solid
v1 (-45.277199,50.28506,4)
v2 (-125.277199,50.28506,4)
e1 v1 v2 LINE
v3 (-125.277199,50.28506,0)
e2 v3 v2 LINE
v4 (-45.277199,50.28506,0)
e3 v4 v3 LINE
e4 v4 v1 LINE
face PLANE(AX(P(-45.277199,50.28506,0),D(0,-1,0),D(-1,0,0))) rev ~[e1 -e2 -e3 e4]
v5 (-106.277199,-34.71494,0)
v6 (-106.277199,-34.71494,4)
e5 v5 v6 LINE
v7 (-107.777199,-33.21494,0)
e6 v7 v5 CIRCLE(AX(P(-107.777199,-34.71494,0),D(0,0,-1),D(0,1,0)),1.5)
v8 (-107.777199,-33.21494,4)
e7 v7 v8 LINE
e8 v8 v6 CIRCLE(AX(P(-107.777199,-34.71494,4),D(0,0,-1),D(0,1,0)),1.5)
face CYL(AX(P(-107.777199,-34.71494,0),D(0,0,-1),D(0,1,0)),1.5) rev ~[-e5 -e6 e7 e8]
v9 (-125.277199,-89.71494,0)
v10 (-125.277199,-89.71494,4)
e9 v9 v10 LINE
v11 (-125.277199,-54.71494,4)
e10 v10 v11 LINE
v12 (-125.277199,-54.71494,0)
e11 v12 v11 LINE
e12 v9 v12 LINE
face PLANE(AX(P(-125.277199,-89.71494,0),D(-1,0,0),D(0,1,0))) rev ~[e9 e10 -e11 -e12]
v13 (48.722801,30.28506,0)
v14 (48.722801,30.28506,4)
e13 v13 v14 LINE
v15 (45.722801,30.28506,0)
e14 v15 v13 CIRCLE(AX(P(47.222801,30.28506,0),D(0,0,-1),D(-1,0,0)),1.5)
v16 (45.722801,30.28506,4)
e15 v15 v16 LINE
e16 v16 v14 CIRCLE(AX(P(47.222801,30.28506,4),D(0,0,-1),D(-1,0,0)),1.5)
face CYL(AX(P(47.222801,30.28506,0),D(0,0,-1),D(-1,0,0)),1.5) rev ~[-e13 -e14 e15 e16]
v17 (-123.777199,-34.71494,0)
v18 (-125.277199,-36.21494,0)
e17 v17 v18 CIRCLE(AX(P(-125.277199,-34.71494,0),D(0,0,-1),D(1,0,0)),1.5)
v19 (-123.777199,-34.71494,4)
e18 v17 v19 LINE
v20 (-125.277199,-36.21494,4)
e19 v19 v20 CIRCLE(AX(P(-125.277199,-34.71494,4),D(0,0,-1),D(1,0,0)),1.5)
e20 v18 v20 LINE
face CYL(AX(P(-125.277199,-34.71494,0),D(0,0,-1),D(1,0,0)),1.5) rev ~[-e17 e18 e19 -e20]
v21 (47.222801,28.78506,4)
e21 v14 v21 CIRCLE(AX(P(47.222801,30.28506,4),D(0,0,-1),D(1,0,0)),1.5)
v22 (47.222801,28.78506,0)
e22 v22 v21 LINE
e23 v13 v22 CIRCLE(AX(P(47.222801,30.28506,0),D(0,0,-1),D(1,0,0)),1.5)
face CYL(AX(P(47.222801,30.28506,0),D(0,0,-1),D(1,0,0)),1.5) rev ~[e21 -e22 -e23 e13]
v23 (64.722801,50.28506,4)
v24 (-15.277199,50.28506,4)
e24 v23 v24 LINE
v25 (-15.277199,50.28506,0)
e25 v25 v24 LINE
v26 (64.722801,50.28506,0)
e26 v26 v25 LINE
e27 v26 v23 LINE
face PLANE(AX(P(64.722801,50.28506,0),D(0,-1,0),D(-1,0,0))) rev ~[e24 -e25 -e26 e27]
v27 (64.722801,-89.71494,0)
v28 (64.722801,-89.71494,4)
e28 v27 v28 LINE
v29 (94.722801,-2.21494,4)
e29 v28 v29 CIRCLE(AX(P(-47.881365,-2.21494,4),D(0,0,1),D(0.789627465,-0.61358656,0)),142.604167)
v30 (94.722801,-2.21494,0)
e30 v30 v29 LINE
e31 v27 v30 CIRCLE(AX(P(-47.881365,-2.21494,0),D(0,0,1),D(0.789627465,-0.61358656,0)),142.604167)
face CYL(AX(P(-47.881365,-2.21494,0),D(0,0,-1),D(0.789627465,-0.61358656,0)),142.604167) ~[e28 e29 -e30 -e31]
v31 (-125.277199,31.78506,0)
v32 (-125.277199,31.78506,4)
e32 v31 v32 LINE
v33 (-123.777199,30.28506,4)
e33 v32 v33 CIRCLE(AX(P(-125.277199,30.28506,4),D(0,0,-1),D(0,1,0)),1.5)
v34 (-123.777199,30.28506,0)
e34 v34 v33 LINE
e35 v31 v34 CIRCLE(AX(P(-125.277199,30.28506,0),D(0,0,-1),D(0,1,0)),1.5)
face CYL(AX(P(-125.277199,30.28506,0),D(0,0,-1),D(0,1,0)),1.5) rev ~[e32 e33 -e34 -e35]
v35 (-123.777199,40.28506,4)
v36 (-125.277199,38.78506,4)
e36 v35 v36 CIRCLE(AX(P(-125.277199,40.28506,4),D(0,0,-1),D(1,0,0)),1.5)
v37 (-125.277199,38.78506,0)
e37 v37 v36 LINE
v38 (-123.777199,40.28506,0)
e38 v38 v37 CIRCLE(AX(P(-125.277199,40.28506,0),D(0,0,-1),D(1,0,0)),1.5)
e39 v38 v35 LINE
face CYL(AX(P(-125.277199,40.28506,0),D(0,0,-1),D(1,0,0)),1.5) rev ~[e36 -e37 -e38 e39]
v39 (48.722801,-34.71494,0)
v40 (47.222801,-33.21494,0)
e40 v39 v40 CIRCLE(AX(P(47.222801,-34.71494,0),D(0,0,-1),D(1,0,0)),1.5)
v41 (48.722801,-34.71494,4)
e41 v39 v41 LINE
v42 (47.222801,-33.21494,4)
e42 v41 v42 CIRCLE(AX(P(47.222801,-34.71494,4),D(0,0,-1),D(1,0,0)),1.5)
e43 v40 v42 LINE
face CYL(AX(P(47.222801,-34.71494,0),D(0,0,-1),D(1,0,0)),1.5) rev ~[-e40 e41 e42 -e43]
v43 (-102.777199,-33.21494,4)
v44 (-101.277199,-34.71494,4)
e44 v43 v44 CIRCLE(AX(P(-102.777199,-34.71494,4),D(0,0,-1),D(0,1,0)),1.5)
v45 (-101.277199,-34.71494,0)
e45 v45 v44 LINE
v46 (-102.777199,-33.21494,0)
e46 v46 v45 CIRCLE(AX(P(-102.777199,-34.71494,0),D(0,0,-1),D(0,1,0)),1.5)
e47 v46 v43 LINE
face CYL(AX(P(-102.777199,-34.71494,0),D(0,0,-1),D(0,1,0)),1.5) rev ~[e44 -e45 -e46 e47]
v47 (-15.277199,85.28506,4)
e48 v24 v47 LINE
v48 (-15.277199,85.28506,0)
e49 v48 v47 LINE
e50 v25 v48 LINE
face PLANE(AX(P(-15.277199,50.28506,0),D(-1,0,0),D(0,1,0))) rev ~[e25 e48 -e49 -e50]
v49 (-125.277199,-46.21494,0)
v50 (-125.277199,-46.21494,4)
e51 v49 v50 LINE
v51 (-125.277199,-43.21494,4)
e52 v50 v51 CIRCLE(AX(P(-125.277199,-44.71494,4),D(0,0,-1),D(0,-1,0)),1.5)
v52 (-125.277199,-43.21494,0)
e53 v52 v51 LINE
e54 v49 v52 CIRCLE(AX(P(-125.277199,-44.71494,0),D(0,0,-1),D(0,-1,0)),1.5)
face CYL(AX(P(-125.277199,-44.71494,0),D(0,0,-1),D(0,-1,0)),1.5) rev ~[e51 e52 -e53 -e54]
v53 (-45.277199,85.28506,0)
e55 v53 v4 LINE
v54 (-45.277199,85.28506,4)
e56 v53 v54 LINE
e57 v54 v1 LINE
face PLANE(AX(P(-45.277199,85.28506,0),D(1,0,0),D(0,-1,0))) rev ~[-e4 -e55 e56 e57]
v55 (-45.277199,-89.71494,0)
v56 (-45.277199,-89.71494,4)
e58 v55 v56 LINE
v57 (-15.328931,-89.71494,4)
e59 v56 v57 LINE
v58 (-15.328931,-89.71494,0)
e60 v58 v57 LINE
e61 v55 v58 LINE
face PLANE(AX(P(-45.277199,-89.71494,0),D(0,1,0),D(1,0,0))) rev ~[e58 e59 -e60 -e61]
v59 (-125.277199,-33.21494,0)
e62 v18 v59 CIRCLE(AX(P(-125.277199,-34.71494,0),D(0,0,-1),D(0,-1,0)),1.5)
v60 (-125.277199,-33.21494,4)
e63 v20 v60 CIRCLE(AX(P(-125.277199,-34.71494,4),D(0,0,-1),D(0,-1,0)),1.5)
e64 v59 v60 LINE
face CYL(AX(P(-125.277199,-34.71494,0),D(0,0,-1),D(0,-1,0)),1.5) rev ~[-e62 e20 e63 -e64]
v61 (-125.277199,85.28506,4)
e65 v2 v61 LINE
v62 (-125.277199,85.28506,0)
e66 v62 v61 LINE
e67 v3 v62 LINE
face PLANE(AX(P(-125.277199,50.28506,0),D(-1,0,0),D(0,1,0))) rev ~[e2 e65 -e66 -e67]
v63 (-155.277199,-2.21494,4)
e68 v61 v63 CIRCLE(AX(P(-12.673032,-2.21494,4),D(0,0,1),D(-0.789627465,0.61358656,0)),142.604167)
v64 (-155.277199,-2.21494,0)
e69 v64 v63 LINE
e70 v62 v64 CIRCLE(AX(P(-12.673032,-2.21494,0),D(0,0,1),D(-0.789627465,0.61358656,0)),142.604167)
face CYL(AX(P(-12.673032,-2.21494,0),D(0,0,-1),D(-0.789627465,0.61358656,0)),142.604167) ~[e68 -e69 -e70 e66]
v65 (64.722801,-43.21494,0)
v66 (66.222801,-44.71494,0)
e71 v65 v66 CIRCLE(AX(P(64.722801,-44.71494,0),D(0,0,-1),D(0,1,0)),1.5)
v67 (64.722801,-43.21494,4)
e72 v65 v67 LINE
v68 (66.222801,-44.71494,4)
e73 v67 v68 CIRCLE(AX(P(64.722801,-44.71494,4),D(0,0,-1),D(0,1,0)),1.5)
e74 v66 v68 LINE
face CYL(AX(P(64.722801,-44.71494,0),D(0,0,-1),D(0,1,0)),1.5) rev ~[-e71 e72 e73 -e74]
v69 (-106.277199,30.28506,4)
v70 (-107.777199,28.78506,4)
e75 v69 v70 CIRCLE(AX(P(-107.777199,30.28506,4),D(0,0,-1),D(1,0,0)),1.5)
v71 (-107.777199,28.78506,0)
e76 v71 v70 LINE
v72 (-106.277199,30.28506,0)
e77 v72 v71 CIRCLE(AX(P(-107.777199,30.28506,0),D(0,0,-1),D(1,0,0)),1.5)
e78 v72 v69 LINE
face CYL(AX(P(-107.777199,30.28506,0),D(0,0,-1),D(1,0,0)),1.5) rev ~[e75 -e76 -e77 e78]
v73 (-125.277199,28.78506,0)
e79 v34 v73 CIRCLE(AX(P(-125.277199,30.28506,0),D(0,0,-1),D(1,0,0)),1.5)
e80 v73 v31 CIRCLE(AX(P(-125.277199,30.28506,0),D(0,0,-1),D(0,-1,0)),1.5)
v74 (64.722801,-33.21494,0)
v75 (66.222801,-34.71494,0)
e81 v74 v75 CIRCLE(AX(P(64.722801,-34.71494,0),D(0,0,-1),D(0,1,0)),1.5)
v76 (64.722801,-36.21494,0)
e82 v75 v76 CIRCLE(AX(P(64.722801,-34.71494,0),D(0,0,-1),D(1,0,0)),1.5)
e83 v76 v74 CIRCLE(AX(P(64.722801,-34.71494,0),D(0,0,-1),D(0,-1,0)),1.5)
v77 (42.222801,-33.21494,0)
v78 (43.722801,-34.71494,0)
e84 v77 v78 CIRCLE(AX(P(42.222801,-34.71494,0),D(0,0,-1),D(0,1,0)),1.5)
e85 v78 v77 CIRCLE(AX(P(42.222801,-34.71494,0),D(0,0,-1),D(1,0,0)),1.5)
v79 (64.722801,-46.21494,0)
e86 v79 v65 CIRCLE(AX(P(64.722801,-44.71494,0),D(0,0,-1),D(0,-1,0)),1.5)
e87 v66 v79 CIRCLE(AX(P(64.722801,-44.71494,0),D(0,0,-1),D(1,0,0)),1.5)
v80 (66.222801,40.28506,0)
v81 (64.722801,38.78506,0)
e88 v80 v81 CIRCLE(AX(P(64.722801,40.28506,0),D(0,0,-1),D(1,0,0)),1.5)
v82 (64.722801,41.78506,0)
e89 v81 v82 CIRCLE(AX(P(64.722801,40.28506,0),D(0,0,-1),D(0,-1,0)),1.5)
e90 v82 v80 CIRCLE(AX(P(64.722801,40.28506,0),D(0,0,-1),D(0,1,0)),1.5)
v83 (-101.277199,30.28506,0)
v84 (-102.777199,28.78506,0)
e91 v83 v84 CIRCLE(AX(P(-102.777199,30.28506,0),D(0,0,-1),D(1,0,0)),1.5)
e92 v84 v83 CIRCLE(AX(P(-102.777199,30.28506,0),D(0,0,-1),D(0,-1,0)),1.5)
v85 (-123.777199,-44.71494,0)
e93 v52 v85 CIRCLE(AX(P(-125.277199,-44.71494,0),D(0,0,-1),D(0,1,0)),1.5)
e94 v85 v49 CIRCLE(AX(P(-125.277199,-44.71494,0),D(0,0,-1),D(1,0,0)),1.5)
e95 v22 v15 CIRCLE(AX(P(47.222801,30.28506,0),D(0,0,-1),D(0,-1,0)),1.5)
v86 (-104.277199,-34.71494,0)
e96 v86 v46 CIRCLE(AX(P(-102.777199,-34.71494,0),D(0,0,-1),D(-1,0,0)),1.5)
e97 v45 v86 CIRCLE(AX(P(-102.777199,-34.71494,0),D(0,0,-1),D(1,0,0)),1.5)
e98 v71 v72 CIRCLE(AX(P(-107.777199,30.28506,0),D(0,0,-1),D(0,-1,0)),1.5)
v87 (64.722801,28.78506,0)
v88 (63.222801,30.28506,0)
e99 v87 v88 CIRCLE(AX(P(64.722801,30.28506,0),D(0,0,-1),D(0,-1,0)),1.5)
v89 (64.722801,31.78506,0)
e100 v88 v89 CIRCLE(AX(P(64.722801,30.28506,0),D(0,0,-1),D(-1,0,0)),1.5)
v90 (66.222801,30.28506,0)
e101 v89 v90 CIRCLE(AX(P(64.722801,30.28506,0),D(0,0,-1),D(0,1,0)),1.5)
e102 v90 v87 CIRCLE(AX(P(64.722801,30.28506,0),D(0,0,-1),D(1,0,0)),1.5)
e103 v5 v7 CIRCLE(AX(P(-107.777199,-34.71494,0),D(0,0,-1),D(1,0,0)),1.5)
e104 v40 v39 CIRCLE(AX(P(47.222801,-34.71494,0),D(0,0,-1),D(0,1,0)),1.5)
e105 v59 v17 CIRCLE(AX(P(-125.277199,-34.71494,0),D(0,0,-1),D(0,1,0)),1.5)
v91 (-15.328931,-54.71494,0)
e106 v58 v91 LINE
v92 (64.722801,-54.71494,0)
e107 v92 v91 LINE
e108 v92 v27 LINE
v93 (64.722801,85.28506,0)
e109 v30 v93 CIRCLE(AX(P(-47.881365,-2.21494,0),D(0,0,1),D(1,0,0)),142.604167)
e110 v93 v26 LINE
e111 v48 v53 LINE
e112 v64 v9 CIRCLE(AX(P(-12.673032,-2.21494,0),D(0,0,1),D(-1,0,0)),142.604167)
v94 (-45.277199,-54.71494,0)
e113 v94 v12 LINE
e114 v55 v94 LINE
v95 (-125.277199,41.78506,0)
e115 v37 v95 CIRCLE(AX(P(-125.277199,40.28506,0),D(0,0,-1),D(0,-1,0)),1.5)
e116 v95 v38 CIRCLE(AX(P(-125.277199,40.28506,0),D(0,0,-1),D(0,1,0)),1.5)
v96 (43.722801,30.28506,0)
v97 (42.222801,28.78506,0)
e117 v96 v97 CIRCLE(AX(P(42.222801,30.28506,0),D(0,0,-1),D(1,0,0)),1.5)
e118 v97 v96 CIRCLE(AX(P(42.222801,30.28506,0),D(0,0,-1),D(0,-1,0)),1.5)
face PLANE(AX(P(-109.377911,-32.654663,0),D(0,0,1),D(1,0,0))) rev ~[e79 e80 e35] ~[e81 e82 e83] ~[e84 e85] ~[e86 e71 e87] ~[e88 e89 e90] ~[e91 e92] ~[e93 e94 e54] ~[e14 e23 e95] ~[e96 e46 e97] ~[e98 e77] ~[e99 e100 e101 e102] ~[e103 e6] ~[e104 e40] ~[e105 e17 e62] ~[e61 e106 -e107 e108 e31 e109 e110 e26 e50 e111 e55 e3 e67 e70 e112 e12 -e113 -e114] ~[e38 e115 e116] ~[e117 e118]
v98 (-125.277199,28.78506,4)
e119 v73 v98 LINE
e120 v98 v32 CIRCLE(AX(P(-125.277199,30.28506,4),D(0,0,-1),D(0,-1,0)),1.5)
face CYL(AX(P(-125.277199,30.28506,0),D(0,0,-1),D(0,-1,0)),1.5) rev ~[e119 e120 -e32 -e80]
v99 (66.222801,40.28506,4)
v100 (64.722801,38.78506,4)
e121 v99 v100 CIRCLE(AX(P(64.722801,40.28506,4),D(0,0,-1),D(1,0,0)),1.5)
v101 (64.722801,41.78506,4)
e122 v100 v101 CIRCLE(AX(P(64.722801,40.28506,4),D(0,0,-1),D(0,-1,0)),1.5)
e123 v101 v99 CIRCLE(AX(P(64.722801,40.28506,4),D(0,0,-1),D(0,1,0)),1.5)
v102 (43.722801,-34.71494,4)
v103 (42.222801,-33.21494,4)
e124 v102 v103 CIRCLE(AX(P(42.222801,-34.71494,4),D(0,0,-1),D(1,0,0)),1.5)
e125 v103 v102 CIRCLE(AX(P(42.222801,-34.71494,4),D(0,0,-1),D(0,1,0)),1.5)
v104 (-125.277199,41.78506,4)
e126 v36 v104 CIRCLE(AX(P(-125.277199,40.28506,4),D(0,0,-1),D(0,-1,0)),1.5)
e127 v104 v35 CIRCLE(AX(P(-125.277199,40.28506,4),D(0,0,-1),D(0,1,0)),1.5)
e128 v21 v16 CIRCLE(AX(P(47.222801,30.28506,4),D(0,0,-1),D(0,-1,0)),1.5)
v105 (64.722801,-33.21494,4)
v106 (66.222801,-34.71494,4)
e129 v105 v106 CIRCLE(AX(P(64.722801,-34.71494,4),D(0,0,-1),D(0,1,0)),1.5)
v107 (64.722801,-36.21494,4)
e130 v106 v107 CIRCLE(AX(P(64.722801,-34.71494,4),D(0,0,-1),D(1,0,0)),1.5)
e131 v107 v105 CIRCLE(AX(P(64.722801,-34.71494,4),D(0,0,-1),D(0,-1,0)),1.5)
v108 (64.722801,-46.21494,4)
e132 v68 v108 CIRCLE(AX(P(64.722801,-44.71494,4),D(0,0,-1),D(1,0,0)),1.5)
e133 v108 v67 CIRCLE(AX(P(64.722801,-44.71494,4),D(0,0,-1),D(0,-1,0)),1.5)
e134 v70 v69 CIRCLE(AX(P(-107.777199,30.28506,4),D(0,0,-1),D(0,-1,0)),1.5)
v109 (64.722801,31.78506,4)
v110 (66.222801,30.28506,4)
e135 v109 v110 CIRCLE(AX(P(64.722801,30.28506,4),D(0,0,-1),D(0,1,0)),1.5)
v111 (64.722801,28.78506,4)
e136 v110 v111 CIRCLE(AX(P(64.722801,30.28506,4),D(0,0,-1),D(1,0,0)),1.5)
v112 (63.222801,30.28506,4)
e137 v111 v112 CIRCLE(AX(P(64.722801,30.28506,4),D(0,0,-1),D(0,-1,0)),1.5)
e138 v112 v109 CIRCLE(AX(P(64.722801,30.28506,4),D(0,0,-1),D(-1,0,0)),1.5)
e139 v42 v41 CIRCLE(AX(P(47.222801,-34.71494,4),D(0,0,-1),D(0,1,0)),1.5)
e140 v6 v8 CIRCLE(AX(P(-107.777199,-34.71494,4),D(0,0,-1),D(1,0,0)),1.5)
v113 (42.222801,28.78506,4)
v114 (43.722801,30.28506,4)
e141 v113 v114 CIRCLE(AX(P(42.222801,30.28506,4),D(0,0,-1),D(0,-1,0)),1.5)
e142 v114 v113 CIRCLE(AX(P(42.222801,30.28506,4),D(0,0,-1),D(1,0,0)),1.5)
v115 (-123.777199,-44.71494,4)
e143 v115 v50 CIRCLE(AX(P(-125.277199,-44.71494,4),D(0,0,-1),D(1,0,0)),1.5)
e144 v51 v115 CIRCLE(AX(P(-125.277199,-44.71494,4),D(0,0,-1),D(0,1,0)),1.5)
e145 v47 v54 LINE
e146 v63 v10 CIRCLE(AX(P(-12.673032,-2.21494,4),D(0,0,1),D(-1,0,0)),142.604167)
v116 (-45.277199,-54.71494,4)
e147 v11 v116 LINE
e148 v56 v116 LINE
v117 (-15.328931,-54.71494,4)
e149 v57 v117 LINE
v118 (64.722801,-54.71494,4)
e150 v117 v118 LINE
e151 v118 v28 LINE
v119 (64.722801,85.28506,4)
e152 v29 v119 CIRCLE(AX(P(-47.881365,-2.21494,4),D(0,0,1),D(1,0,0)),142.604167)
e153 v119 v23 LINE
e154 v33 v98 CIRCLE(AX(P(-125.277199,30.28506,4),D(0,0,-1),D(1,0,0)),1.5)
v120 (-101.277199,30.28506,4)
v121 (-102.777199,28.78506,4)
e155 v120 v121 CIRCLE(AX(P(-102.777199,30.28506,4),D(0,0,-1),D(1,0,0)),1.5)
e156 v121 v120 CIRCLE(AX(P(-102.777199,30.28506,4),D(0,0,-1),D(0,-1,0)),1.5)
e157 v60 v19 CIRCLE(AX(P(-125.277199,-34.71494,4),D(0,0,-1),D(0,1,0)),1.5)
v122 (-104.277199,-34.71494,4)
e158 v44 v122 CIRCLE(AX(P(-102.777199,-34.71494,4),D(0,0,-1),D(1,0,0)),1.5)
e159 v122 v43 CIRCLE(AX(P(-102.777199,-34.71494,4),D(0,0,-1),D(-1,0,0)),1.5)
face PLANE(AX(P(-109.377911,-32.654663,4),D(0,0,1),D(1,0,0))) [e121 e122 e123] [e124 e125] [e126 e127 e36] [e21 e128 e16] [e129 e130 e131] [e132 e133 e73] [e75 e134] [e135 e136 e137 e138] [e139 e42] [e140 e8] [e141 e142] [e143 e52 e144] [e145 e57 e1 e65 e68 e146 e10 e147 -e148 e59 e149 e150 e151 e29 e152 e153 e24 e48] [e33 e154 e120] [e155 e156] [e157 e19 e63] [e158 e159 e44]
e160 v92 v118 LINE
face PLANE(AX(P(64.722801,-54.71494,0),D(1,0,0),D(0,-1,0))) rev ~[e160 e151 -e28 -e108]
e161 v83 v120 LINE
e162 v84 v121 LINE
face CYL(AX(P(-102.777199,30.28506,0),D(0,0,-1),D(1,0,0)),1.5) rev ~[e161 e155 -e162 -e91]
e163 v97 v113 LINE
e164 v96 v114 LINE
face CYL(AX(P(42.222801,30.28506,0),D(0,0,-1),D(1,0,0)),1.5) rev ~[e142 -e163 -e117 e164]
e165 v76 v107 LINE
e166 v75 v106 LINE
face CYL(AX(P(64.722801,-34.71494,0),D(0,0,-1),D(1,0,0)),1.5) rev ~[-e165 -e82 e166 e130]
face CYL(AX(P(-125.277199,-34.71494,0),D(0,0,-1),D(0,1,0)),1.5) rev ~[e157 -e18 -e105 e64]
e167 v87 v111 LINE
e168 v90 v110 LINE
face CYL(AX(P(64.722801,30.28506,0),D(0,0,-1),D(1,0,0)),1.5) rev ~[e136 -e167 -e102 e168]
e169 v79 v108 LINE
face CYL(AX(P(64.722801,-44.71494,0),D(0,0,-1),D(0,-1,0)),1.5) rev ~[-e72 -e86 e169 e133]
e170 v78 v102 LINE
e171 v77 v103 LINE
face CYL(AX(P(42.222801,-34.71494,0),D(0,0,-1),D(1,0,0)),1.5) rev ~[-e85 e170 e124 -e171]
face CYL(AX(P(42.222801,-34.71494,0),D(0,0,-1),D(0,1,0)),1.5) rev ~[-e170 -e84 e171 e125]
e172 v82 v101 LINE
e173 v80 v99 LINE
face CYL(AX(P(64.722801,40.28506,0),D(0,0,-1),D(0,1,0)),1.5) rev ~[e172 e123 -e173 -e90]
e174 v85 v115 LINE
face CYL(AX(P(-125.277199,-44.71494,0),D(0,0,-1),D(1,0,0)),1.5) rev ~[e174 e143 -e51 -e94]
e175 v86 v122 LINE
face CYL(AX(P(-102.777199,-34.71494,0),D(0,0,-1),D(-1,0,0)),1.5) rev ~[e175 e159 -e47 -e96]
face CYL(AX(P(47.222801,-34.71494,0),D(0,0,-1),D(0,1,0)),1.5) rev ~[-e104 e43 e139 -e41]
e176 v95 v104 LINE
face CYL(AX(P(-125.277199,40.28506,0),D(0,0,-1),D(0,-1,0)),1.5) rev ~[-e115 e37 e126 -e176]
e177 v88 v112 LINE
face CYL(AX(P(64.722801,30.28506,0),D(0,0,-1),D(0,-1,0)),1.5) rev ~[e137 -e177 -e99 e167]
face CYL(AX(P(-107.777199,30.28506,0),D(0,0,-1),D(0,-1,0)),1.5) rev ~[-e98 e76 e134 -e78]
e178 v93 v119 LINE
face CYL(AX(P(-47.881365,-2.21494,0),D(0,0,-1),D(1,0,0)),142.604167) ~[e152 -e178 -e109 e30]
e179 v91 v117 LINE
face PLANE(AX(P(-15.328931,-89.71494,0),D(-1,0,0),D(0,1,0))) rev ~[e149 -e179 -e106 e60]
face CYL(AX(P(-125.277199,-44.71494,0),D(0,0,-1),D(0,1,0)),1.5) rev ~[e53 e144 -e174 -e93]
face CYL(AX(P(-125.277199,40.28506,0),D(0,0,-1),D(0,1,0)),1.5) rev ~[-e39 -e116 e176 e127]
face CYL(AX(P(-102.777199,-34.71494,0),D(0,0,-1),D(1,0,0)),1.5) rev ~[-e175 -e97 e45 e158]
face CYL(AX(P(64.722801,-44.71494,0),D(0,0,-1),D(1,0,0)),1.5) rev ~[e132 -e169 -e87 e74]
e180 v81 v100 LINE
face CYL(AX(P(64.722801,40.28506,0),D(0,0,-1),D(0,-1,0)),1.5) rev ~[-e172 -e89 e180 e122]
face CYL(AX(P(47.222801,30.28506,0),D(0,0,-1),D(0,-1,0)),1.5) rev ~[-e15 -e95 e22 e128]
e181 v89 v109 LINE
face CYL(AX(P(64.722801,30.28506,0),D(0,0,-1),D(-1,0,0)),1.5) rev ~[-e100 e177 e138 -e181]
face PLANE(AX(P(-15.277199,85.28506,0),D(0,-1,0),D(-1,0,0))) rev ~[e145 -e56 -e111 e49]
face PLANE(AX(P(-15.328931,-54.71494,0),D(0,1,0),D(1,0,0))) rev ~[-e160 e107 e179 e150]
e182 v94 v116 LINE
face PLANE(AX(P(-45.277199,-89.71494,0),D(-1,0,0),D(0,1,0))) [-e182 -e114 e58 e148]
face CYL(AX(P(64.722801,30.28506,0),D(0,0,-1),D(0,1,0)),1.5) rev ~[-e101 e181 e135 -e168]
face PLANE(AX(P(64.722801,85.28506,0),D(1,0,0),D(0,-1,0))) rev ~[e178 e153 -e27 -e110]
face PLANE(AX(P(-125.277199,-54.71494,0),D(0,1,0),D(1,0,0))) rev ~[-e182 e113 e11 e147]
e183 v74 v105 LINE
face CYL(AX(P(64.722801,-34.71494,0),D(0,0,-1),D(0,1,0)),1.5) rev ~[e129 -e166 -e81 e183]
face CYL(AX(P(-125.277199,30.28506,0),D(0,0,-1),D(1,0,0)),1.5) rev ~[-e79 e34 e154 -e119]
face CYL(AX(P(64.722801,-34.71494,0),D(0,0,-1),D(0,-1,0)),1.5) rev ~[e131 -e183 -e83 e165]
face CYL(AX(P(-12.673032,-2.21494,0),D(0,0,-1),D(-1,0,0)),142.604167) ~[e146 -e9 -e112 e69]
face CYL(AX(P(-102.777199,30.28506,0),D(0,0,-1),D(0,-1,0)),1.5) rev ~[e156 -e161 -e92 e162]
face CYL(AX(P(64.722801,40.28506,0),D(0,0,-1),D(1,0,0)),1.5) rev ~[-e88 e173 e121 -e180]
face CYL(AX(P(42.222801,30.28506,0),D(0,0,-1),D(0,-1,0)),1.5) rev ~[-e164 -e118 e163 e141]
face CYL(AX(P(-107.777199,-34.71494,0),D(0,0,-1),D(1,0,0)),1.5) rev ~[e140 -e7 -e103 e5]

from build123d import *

# Parameters (mm, degrees)
F0_W     = 15
F0_H     = 4.4212083991
F0_H_2   = 48.0787916009
F0_W_2   = 29.9482679234
F0_H_3   = 35
F1_DEPTH = 4
F2_DEPTH = 4


with BuildPart() as f1:
    # F0 (on Top) → F1 (new body)
    with BuildSketch(Plane.XY):
        with BuildLine():
            Line((-125.2771986143, 41.785060304), (-125.2771986143, 50.285060304))
            Line((-125.2771986143, 50.285060304), (-125.2771986143, 85.285060304))
            ThreePointArc((-125.2771986143, 85.285060304), (-147.5688652809, 44.035060304), (-155.2771986143, -2.214939696))
            Line((-155.2771986143, -2.214939696), (-125.2771986143, -2.214939696))
            Line((-125.2771986143, -2.214939696), (-125.2771986143, 28.785060304))
            ThreePointArc((-125.2771986143, 28.785060304), (-126.7771986143, 30.285060304), (-125.2771986143, 31.785060304))
            Line((-125.2771986143, 31.785060304), (-125.2771986143, 38.785060304))
            ThreePointArc((-125.2771986143, 38.785060304), (-126.7771986143, 40.285060304), (-125.2771986143, 41.785060304))
        make_face()
        with BuildLine():
            Line((-85.2771986143, 50.285060304), (-125.2771986143, 50.285060304))
            Line((-125.2771986143, 50.285060304), (-125.2771986143, 41.785060304))
            ThreePointArc((-125.2771986143, 41.785060304), (-124.2165384425, 41.3457204758), (-123.7771986143, 40.285060304))
            ThreePointArc((-123.7771986143, 40.285060304), (-124.2165384425, 39.2244001322), (-125.2771986143, 38.785060304))
            Line((-125.2771986143, 38.785060304), (-125.2771986143, 31.785060304))
            ThreePointArc((-125.2771986143, 31.785060304), (-124.2165384425, 31.3457204758), (-123.7771986143, 30.285060304))
            ThreePointArc((-123.7771986143, 30.285060304), (-124.2165384425, 29.2244001322), (-125.2771986143, 28.785060304))
            Line((-125.2771986143, 28.785060304), (-125.2771986143, -2.214939696))
            Line((-125.2771986143, -2.214939696), (-107.7771986143, -2.214939696))
            Line((-107.7771986143, -2.214939696), (-102.7771986143, -2.214939696))
            Line((-102.7771986143, -2.214939696), (-85.2771986143, -2.214939696))
            Line((-85.2771986143, -2.214939696), (-85.2771986143, 50.285060304))
        make_face()
        with BuildLine():
            ThreePointArc((-106.2771986143, 30.285060304), (-106.7165384425, 29.2244001322), (-107.7771986143, 28.785060304))
            ThreePointArc((-107.7771986143, 28.785060304), (-108.837858786, 31.3457204758), (-106.2771986143, 30.285060304))
        make_face(mode=Mode.SUBTRACT)
        with BuildLine():
            ThreePointArc((-101.2771986143, 30.285060304), (-101.7165384425, 29.2244001322), (-102.7771986143, 28.785060304))
            ThreePointArc((-102.7771986143, 28.785060304), (-103.837858786, 31.3457204758), (-101.2771986143, 30.285060304))
        make_face(mode=Mode.SUBTRACT)
        Polygon((-45.2771986143, 50.285060304), (-85.2771986143, 50.285060304), (-85.2771986143, -2.214939696), (-45.2771986143, -2.214939696), (-45.2771986143, 45.8638519049), align=None)
        with Locations((-37.7771986143, 48.0744561044)):
            Rectangle(F0_W, F0_H)
        Polygon((-45.2771986143, 85.285060304), (-45.2771986143, 50.285060304), (-30.2771986143, 50.285060304), (-15.2771986143, 50.285060304), (-15.2771986143, 85.285060304), align=None)
        Polygon((-45.2771986143, -2.214939696), (-85.2771986143, -2.214939696), (-85.2771986143, -34.714939696), (-85.2771986143, -54.714939696), (-45.2771986143, -54.714939696), align=None)
        with BuildLine():
            Line((-125.2771986143, -2.214939696), (-155.2771986143, -2.214939696))
            ThreePointArc((-155.2771986143, -2.214939696), (-147.5688652809, -48.464939696), (-125.2771986143, -89.714939696))
            Line((-125.2771986143, -89.714939696), (-125.2771986143, -54.714939696))
            Line((-125.2771986143, -54.714939696), (-125.2771986143, -46.214939696))
            ThreePointArc((-125.2771986143, -46.214939696), (-126.7771986143, -44.714939696), (-125.2771986143, -43.214939696))
            Line((-125.2771986143, -43.214939696), (-125.2771986143, -36.214939696))
            ThreePointArc((-125.2771986143, -36.214939696), (-126.7771986143, -34.714939696), (-125.2771986143, -33.214939696))
            Line((-125.2771986143, -33.214939696), (-125.2771986143, -2.214939696))
        make_face()
        with Locations((-37.7771986143, 21.8244561044)):
            Rectangle(F0_W, F0_H_2)
        with Locations((-22.7771986143, 48.0744561044)):
            Rectangle(F0_W, F0_H)
        Polygon((-30.2771986143, -2.214939696), (-45.2771986143, -2.214939696), (-45.2771986143, -54.714939696), (-15.3289306909, -54.714939696), (-15.2771986143, -54.714939696), (-15.2771986143, -2.214939696), align=None)
        with Locations((-22.7771986143, 21.8244561044)):
            Rectangle(F0_W, F0_H_2)
        with BuildLine():
            Line((64.7228013857, 50.285060304), (-15.2771986143, 50.285060304))
            Line((-15.2771986143, 50.285060304), (-15.2771986143, 45.8638519049))
            Line((-15.2771986143, 45.8638519049), (-15.2771986143, -2.214939696))
            Line((-15.2771986143, -2.214939696), (42.2228013857, -2.214939696))
            Line((42.2228013857, -2.214939696), (42.2228013857, 28.785060304))
            ThreePointArc((42.2228013857, 28.785060304), (41.162141214, 31.3457204758), (43.7228013857, 30.285060304))
            Line((43.7228013857, 30.285060304), (45.7228013857, 30.285060304))
            ThreePointArc((45.7228013857, 30.285060304), (47.2228013857, 31.785060304), (48.7228013857, 30.285060304))
            Line((48.7228013857, 30.285060304), (63.2228013857, 30.285060304))
            ThreePointArc((63.2228013857, 30.285060304), (63.662141214, 31.3457204758), (64.7228013857, 31.785060304))
            Line((64.7228013857, 31.785060304), (64.7228013857, 38.785060304))
            ThreePointArc((64.7228013857, 38.785060304), (63.2228013857, 40.285060304), (64.7228013857, 41.785060304))
            Line((64.7228013857, 41.785060304), (64.7228013857, 50.285060304))
        make_face()
        with Locations((-30.3030646526, -72.214939696)):
            Rectangle(F0_W_2, F0_H_3)
        with BuildLine():
            Line((64.7228013857, 85.285060304), (64.7228013857, 50.285060304))
            Line((64.7228013857, 50.285060304), (64.7228013857, 41.785060304))
            ThreePointArc((64.7228013857, 41.785060304), (65.7834615575, 41.3457204758), (66.2228013857, 40.285060304))
            ThreePointArc((66.2228013857, 40.285060304), (65.7834615575, 39.2244001322), (64.7228013857, 38.785060304))
            Line((64.7228013857, 38.785060304), (64.7228013857, 31.785060304))
            ThreePointArc((64.7228013857, 31.785060304), (65.7834615575, 31.3457204758), (66.2228013857, 30.285060304))
            ThreePointArc((66.2228013857, 30.285060304), (65.7834615575, 29.2244001322), (64.7228013857, 28.785060304))
            Line((64.7228013857, 28.785060304), (64.7228013857, -2.214939696))
            Line((64.7228013857, -2.214939696), (94.7228013857, -2.214939696))
            ThreePointArc((94.7228013857, -2.214939696), (87.0144680524, 44.035060304), (64.7228013857, 85.285060304))
        make_face()
        with BuildLine():
            Line((42.2228013857, -2.214939696), (-15.2771986143, -2.214939696))
            Line((-15.2771986143, -2.214939696), (-15.2771986143, -54.714939696))
            Line((-15.2771986143, -54.714939696), (64.7228013857, -54.714939696))
            Line((64.7228013857, -54.714939696), (64.7228013857, -46.214939696))
            ThreePointArc((64.7228013857, -46.214939696), (63.2228013857, -44.714939696), (64.7228013857, -43.214939696))
            Line((64.7228013857, -43.214939696), (64.7228013857, -36.214939696))
            ThreePointArc((64.7228013857, -36.214939696), (63.2228013857, -34.714939696), (64.7228013857, -33.214939696))
            Line((64.7228013857, -33.214939696), (64.7228013857, -2.214939696))
            Line((64.7228013857, -2.214939696), (47.2228013857, -2.214939696))
            Line((47.2228013857, -2.214939696), (42.2228013857, -2.214939696))
        make_face()
        with BuildLine():
            ThreePointArc((43.7228013857, -34.714939696), (41.162141214, -35.7755998678), (42.2228013857, -33.214939696))
            ThreePointArc((42.2228013857, -33.214939696), (43.2834615575, -33.6542795242), (43.7228013857, -34.714939696))
        make_face(mode=Mode.SUBTRACT)
        with BuildLine():
            ThreePointArc((48.7228013857, -34.714939696), (46.162141214, -35.7755998678), (47.2228013857, -33.214939696))
            ThreePointArc((47.2228013857, -33.214939696), (48.2834615575, -33.6542795242), (48.7228013857, -34.714939696))
        make_face(mode=Mode.SUBTRACT)
        with BuildLine():
            Line((42.2228013857, 28.785060304), (42.2228013857, -2.214939696))
            Line((42.2228013857, -2.214939696), (47.2228013857, -2.214939696))
            Line((47.2228013857, -2.214939696), (47.2228013857, 28.785060304))
            ThreePointArc((47.2228013857, 28.785060304), (46.162141214, 29.2244001322), (45.7228013857, 30.285060304))
            Line((45.7228013857, 30.285060304), (43.7228013857, 30.285060304))
            ThreePointArc((43.7228013857, 30.285060304), (43.2834615575, 29.2244001322), (42.2228013857, 28.785060304))
        make_face()
        with BuildLine():
            ThreePointArc((64.7228013857, -89.714939696), (87.0144680524, -48.464939696), (94.7228013857, -2.214939696))
            Line((94.7228013857, -2.214939696), (64.7228013857, -2.214939696))
            Line((64.7228013857, -2.214939696), (64.7228013857, -33.214939696))
            ThreePointArc((64.7228013857, -33.214939696), (65.7834615575, -33.6542795242), (66.2228013857, -34.714939696))
            ThreePointArc((66.2228013857, -34.714939696), (65.7834615575, -35.7755998678), (64.7228013857, -36.214939696))
            Line((64.7228013857, -36.214939696), (64.7228013857, -43.214939696))
            ThreePointArc((64.7228013857, -43.214939696), (65.7834615575, -43.6542795242), (66.2228013857, -44.714939696))
            ThreePointArc((66.2228013857, -44.714939696), (65.7834615575, -45.7755998678), (64.7228013857, -46.214939696))
            Line((64.7228013857, -46.214939696), (64.7228013857, -54.714939696))
            Line((64.7228013857, -54.714939696), (64.7228013857, -89.714939696))
        make_face()
        with BuildLine():
            Line((47.2228013857, 28.785060304), (47.2228013857, -2.214939696))
            Line((47.2228013857, -2.214939696), (64.7228013857, -2.214939696))
            Line((64.7228013857, -2.214939696), (64.7228013857, 28.785060304))
            ThreePointArc((64.7228013857, 28.785060304), (63.662141214, 29.2244001322), (63.2228013857, 30.285060304))
            Line((63.2228013857, 30.285060304), (48.7228013857, 30.285060304))
            ThreePointArc((48.7228013857, 30.285060304), (48.2834615575, 29.2244001322), (47.2228013857, 28.785060304))
        make_face()
    extrude(amount=F1_DEPTH)

    # F0 (on Top) → F2 (join)
    with BuildSketch(Plane.XY):
        with BuildLine():
            Line((-85.2771986143, -54.714939696), (-85.2771986143, -34.714939696))
            Line((-85.2771986143, -34.714939696), (-101.2771986143, -34.714939696))
            ThreePointArc((-101.2771986143, -34.714939696), (-102.7771986143, -36.214939696), (-104.2771986143, -34.714939696))
            ThreePointArc((-104.2771986143, -34.714939696), (-105.2771986143, -35.714939696), (-106.2771986143, -34.714939696))
            ThreePointArc((-106.2771986143, -34.714939696), (-108.837858786, -35.7755998678), (-107.7771986143, -33.214939696))
            Line((-107.7771986143, -33.214939696), (-107.7771986143, -2.214939696))
            Line((-107.7771986143, -2.214939696), (-125.2771986143, -2.214939696))
            Line((-125.2771986143, -2.214939696), (-125.2771986143, -33.214939696))
            ThreePointArc((-125.2771986143, -33.214939696), (-124.2165384425, -33.6542795242), (-123.7771986143, -34.714939696))
            ThreePointArc((-123.7771986143, -34.714939696), (-124.2165384425, -35.7755998678), (-125.2771986143, -36.214939696))
            Line((-125.2771986143, -36.214939696), (-125.2771986143, -43.214939696))
            ThreePointArc((-125.2771986143, -43.214939696), (-124.2165384425, -43.6542795242), (-123.7771986143, -44.714939696))
            ThreePointArc((-123.7771986143, -44.714939696), (-124.2165384425, -45.7755998678), (-125.2771986143, -46.214939696))
            Line((-125.2771986143, -46.214939696), (-125.2771986143, -54.714939696))
            Line((-125.2771986143, -54.714939696), (-85.2771986143, -54.714939696))
        make_face()
        with BuildLine():
            ThreePointArc((-106.2771986143, -34.714939696), (-105.2771986143, -35.714939696), (-104.2771986143, -34.714939696))
            Line((-104.2771986143, -34.714939696), (-105.2771986143, -34.714939696))
            Line((-105.2771986143, -34.714939696), (-106.2771986143, -34.714939696))
        make_face()
        with BuildLine():
            Line((-105.2771986143, -34.714939696), (-104.2771986143, -34.714939696))
            ThreePointArc((-104.2771986143, -34.714939696), (-105.2771986143, -33.714939696), (-106.2771986143, -34.714939696))
            Line((-106.2771986143, -34.714939696), (-105.2771986143, -34.714939696))
        make_face()
        with BuildLine():
            Line((-102.7771986143, -33.214939696), (-102.7771986143, -2.214939696))
            Line((-102.7771986143, -2.214939696), (-107.7771986143, -2.214939696))
            Line((-107.7771986143, -2.214939696), (-107.7771986143, -33.214939696))
            ThreePointArc((-107.7771986143, -33.214939696), (-106.7165384425, -33.6542795242), (-106.2771986143, -34.714939696))
            ThreePointArc((-106.2771986143, -34.714939696), (-105.2771986143, -33.714939696), (-104.2771986143, -34.714939696))
            ThreePointArc((-104.2771986143, -34.714939696), (-103.837858786, -33.6542795242), (-102.7771986143, -33.214939696))
        make_face()
        with BuildLine():
            Line((-85.2771986143, -34.714939696), (-85.2771986143, -2.214939696))
            Line((-85.2771986143, -2.214939696), (-102.7771986143, -2.214939696))
            Line((-102.7771986143, -2.214939696), (-102.7771986143, -33.214939696))
            ThreePointArc((-102.7771986143, -33.214939696), (-101.7165384425, -33.6542795242), (-101.2771986143, -34.714939696))
            Line((-101.2771986143, -34.714939696), (-85.2771986143, -34.714939696))
        make_face()
        with BuildLine():
            Line((42.2228013857, -2.214939696), (-15.2771986143, -2.214939696))
            Line((-15.2771986143, -2.214939696), (-15.2771986143, -54.714939696))
            Line((-15.2771986143, -54.714939696), (64.7228013857, -54.714939696))
            Line((64.7228013857, -54.714939696), (64.7228013857, -46.214939696))
            ThreePointArc((64.7228013857, -46.214939696), (63.2228013857, -44.714939696), (64.7228013857, -43.214939696))
            Line((64.7228013857, -43.214939696), (64.7228013857, -36.214939696))
            ThreePointArc((64.7228013857, -36.214939696), (63.2228013857, -34.714939696), (64.7228013857, -33.214939696))
            Line((64.7228013857, -33.214939696), (64.7228013857, -2.214939696))
            Line((64.7228013857, -2.214939696), (47.2228013857, -2.214939696))
            Line((47.2228013857, -2.214939696), (42.2228013857, -2.214939696))
        make_face()
        with BuildLine():
            ThreePointArc((43.7228013857, -34.714939696), (41.162141214, -35.7755998678), (42.2228013857, -33.214939696))
            ThreePointArc((42.2228013857, -33.214939696), (43.2834615575, -33.6542795242), (43.7228013857, -34.714939696))
        make_face(mode=Mode.SUBTRACT)
        with BuildLine():
            ThreePointArc((48.7228013857, -34.714939696), (46.162141214, -35.7755998678), (47.2228013857, -33.214939696))
            ThreePointArc((47.2228013857, -33.214939696), (48.2834615575, -33.6542795242), (48.7228013857, -34.714939696))
        make_face(mode=Mode.SUBTRACT)
    extrude(amount=F2_DEPTH)


solid = f1.part
